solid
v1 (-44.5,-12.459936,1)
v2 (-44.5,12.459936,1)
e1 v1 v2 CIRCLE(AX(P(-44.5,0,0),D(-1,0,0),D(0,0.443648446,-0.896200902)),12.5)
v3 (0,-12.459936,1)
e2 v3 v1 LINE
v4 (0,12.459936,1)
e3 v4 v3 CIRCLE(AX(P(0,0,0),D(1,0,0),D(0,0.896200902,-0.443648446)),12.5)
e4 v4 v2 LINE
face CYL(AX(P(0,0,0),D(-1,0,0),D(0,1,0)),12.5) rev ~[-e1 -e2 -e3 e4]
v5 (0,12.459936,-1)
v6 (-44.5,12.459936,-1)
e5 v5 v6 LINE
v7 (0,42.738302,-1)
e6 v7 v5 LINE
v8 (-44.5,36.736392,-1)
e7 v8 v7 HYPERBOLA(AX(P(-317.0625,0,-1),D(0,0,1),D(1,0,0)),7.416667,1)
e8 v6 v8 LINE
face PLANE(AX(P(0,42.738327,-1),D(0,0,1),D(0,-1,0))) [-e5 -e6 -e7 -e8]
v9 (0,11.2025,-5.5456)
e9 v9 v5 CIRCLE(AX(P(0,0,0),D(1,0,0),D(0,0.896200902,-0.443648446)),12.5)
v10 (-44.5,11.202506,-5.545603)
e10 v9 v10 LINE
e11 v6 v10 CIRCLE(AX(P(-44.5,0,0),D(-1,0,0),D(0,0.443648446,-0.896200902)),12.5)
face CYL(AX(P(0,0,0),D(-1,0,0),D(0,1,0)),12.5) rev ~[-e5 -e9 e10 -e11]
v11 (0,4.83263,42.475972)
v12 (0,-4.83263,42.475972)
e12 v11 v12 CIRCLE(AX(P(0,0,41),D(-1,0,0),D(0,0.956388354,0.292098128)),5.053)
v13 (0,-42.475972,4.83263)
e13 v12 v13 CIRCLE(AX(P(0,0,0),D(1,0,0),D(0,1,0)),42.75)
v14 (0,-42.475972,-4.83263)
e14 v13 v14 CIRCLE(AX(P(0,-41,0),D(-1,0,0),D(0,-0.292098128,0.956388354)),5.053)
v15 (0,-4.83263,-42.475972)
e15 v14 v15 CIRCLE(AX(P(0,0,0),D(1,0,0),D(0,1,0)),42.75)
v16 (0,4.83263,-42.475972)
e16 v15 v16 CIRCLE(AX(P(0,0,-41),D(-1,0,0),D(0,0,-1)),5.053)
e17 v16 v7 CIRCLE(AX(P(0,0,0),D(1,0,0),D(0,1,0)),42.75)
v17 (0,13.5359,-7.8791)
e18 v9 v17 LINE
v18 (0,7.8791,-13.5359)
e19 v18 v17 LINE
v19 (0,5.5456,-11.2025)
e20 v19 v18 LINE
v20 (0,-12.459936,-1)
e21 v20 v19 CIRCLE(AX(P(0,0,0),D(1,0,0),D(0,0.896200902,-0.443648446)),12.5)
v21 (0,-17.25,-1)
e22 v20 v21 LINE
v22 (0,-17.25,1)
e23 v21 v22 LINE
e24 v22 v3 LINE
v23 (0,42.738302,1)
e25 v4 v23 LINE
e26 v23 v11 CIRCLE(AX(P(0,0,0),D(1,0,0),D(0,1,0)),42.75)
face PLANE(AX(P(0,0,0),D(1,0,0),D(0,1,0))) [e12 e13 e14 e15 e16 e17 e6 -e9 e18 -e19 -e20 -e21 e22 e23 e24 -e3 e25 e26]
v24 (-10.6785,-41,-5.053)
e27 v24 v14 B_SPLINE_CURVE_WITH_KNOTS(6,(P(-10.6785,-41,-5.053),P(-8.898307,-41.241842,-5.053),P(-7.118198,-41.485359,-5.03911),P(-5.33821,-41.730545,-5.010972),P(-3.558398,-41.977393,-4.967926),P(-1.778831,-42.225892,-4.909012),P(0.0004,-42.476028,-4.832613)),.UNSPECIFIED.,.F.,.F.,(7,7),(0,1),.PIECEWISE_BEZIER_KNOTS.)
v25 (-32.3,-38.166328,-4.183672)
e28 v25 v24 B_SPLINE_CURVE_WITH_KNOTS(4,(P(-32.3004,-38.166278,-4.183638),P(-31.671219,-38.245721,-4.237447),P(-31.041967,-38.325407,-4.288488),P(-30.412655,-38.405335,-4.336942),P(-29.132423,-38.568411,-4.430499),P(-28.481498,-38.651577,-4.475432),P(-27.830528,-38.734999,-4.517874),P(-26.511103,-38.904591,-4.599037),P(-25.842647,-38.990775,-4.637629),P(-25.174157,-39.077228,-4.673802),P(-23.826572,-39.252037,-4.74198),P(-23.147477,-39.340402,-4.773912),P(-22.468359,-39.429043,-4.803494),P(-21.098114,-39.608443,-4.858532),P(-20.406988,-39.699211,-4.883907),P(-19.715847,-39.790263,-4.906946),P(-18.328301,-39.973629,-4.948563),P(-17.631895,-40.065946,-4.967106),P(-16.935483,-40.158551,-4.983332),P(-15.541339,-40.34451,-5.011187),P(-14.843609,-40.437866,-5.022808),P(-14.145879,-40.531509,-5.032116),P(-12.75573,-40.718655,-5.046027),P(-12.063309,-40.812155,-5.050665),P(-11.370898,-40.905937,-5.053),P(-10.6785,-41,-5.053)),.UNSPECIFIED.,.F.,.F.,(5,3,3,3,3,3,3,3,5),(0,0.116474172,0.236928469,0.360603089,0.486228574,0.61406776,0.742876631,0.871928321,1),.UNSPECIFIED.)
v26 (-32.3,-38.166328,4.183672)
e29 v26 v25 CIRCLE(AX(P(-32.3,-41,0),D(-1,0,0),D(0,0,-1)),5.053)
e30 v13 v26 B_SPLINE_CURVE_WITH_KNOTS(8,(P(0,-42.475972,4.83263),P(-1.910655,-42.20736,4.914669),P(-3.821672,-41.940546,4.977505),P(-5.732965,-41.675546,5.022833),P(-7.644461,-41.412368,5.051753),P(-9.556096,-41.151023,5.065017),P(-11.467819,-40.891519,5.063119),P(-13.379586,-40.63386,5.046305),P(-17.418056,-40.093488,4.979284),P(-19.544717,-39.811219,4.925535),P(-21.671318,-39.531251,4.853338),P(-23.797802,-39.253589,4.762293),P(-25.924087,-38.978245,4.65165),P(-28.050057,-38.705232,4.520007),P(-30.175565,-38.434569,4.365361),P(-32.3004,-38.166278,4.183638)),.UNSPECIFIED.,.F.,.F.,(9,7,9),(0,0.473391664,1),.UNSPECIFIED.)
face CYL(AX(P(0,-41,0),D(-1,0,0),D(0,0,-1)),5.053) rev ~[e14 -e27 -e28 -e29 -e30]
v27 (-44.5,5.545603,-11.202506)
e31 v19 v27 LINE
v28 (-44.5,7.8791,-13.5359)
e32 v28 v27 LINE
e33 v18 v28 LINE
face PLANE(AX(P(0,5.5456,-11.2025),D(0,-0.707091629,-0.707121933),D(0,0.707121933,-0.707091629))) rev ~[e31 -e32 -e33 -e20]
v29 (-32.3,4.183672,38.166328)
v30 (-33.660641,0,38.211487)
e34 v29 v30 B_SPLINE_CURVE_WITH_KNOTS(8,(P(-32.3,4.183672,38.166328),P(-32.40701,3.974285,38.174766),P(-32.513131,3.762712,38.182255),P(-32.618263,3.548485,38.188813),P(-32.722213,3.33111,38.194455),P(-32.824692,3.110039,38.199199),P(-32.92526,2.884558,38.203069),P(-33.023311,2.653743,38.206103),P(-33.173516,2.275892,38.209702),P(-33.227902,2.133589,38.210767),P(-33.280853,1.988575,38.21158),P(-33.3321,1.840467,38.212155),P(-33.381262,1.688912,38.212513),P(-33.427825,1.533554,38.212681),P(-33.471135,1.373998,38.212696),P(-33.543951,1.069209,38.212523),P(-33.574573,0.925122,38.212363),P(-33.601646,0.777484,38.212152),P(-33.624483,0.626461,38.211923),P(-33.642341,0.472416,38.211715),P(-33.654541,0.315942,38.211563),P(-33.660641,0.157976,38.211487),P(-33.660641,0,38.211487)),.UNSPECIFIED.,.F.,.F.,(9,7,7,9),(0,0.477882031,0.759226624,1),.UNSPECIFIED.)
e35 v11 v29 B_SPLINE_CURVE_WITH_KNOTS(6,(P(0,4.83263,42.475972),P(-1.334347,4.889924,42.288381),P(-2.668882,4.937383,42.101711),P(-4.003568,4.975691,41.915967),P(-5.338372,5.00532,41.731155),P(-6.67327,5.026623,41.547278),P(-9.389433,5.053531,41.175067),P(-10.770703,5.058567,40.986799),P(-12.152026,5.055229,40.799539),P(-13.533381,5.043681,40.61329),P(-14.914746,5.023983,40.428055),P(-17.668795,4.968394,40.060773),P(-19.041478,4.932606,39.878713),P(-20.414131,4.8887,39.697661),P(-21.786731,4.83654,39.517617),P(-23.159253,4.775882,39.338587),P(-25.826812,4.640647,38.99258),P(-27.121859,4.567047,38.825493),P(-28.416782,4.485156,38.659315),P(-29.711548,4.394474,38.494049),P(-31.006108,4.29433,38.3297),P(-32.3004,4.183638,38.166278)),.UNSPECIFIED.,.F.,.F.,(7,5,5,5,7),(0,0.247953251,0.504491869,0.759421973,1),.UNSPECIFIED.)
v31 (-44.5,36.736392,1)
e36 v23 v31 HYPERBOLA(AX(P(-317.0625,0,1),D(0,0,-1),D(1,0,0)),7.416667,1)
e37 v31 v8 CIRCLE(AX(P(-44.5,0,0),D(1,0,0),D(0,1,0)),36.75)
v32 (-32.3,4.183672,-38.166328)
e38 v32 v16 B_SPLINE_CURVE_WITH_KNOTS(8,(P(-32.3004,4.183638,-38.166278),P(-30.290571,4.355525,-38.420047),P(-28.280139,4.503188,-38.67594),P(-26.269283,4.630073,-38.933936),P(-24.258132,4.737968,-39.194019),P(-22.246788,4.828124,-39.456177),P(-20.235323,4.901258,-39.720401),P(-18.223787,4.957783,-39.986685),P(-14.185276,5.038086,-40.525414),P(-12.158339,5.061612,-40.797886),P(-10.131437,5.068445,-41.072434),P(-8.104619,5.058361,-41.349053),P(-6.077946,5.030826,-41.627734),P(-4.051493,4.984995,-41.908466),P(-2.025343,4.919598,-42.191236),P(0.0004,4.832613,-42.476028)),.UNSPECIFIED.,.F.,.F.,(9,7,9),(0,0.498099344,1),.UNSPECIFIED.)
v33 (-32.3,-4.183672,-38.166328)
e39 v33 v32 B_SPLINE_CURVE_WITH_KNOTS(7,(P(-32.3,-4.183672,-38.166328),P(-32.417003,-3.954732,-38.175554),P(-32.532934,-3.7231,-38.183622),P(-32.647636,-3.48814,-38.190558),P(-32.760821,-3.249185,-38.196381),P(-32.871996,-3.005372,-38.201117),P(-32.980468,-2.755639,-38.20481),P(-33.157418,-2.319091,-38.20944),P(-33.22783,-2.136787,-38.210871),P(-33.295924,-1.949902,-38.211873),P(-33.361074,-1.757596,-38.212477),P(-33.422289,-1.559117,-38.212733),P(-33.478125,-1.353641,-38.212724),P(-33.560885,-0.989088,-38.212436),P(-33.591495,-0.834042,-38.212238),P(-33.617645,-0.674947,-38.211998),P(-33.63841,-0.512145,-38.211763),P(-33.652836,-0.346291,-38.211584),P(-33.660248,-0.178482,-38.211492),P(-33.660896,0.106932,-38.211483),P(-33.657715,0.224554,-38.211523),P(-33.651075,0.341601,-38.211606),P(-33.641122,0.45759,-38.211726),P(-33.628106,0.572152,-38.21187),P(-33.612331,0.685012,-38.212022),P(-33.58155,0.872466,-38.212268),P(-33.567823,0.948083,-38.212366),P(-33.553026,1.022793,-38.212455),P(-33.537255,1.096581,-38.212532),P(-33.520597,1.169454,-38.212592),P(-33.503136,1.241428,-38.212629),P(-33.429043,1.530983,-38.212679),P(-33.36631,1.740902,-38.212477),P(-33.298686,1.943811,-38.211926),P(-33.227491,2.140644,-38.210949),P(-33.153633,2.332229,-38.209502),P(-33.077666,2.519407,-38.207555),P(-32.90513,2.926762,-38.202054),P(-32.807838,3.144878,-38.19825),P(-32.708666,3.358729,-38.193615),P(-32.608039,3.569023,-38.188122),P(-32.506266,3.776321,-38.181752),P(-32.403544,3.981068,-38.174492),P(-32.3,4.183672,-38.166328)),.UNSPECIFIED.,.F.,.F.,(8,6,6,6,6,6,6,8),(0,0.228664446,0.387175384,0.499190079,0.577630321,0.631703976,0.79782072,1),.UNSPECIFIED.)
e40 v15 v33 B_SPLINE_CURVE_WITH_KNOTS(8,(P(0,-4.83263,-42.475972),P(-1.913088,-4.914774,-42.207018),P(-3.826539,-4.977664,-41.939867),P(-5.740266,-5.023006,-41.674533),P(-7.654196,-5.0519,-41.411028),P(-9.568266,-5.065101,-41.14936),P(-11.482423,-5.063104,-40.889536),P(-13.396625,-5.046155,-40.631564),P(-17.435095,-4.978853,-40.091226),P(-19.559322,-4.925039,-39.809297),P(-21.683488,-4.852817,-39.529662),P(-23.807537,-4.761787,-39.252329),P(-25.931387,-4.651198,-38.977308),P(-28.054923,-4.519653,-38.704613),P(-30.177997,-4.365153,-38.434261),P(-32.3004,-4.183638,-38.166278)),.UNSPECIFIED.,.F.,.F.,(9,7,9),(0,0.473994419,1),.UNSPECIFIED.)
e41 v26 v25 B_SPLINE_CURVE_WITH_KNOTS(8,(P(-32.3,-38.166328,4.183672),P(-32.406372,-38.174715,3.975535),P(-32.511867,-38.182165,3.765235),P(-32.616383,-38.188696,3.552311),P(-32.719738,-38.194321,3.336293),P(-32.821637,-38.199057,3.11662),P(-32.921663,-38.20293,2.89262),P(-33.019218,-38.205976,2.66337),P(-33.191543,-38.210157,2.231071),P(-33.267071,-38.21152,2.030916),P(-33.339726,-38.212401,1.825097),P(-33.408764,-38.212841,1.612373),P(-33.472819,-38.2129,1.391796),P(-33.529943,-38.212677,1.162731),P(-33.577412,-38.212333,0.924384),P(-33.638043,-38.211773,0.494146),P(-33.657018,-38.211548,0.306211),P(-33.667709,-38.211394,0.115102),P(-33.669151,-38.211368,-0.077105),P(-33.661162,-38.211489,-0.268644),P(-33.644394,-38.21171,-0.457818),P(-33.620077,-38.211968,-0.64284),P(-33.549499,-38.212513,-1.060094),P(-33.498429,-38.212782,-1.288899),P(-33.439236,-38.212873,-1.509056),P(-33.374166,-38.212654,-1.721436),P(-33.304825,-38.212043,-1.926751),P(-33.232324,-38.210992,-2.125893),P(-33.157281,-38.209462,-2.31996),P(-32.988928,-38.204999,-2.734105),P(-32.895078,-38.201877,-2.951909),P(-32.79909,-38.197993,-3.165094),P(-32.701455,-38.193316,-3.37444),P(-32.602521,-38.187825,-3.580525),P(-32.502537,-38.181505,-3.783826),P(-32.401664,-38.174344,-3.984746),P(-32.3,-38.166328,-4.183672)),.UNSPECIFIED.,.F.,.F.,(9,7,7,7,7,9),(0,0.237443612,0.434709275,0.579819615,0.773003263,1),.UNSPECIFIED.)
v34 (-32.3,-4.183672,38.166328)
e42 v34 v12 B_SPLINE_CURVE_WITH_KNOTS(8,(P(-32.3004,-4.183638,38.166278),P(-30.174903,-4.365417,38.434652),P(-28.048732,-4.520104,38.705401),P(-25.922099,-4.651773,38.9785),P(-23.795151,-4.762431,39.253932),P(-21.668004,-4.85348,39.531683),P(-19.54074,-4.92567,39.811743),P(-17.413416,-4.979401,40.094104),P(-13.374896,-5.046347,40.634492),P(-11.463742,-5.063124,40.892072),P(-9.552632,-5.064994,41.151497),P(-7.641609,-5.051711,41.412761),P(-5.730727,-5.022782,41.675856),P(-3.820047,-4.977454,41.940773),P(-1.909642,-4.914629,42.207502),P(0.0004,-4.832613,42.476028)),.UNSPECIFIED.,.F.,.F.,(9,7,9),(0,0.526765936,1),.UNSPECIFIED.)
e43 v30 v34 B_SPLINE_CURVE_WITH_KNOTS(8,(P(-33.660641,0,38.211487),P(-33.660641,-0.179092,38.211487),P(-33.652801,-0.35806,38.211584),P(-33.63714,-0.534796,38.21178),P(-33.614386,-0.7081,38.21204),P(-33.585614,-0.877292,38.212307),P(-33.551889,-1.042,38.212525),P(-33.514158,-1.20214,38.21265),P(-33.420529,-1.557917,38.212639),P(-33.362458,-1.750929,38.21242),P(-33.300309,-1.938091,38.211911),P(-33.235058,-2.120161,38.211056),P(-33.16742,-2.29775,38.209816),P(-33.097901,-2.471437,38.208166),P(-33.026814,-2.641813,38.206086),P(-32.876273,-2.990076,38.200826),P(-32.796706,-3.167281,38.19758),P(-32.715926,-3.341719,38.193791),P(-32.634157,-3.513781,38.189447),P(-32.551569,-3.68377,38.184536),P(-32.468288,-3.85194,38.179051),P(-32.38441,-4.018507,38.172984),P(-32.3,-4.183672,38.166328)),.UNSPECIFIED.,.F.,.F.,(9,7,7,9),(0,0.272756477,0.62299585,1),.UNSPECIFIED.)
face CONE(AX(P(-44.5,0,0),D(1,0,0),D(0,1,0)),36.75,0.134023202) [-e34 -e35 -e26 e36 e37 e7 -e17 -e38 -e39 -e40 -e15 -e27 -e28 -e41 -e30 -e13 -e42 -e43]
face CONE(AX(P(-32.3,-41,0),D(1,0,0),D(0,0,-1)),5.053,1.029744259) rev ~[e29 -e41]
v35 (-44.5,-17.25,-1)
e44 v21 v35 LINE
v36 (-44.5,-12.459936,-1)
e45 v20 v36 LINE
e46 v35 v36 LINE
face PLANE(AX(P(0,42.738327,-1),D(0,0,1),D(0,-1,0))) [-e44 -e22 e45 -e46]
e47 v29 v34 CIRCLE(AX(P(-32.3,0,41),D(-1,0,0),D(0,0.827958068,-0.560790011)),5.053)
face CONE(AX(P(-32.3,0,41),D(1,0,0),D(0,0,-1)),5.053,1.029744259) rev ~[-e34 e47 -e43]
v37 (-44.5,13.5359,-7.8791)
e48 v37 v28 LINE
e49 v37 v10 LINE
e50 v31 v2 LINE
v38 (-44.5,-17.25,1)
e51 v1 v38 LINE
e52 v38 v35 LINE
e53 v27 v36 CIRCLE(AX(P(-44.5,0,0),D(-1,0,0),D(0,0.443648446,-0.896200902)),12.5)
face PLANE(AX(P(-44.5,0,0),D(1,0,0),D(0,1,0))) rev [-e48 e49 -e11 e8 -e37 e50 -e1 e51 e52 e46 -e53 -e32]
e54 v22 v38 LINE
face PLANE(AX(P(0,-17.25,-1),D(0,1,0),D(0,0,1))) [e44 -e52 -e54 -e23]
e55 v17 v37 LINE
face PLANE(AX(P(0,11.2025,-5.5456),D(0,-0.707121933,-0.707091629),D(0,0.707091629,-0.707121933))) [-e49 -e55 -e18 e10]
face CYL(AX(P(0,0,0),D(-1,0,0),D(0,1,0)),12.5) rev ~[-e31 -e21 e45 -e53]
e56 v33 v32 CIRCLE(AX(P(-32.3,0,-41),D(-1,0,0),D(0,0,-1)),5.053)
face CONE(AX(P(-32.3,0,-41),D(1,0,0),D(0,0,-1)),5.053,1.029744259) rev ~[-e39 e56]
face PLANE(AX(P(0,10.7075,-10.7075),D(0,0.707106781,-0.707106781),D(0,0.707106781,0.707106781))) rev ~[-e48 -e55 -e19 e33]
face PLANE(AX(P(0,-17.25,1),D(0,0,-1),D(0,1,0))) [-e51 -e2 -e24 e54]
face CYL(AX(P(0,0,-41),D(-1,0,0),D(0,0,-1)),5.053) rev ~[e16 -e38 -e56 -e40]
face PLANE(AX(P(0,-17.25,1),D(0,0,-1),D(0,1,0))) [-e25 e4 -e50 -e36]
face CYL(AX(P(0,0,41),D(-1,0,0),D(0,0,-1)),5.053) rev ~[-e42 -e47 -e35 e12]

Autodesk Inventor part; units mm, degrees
ref_plane "YZ Plane" through (0, 0, 0) normal (1, 0, 0) x (0, 1, 0)
ref_plane "XZ Plane" through (0, 0, 0) normal (0, 1, 0) x (-1, 0, 0)
ref_plane "XY Plane" through (0, 0, 0) normal (0, 0, 1) x (1, 0, 0)
sketch "Esquisse1" plane through (0, 0, 0) normal (0, 0, 1) x (1, 0, 0)
  line L0 (-36.1898, 0) -> (37.2521, 0)
  line L1 (0, 12.5) -> (-44.5, 12.5)
  line L2 (-44.5, 12.5) -> (-44.5, 36.75)
  line L3 (-44.5, 36.75) -> (0, 42.75)
  line L4 (0, 42.75) -> (0, 12.5)
  point P0 (0, 0)
  dimension "d0" = 25
  dimension "d1" = 85.5
  dimension "d2" = 0
  dimension "d3" = 73.5
  dimension "d4" = 44.5
  dimension "d5" = 0
revolve "Révolution1" add sketch "Esquisse1" angle 360 about axis through (-36.1898, 0, 0) along (1, 0, 0)
sketch "Esquisse3" plane through (0, 0, 0) normal (1, 0, 0) x (0, 0, -1)
  circle A0 centre (0, 0) radius 41
  circle A1 centre (0, 0) radius 12.5 projected
  line L0 (0, 0) -> (-59.2945, 0)
  line L1 (0, 0) -> (0, -53.2291)
  line L2 (0, 0) -> (55.0659, 0)
  point P0 (0, -41)
  point P1 (41, 0)
  point P2 (-41, 0)
  dimension "d16" = 82
hole "Perçage1" at (0, -41, 0) at (0, 0, 41) at (0, 0, -41) direction (-1, 0, 0) diameter 10.106 depth 32.3 tip angle 118 thread size "M12x1.75" class "6H" standard "ANSI Metric M Profile"
sketch "Esquisse4" plane through (0, 0, 0) normal (1, 0, 0) x (0, 0, 1)
  line L0 (0, 0) -> (-39.036, -39.036)
  line L1 (0, 0) -> (-55.3193, 0)
  circle A0 centre (0, 0) radius 12.5 projected
  line L2 (-5.5456, -11.2025) -> (-7.8791, -13.5359)
  line L3 (-11.2025, -5.5456) -> (-13.5359, -7.8791)
  line L4 (-13.5359, -7.8791) -> (-7.8791, -13.5359)
  dimension "d17" = 45
  dimension "d20" = 3.3
  dimension "d21" = 3.3
  dimension "d22" = 4
  dimension "d23" = 4
extrude "Extrusion1" cut sketch "Esquisse4" against normal through all contours A0 L2 L4 L0 | L0 L4 L3 A0
sketch "Esquisse5" plane through (0, 0, 0) normal (1, 0, 0) x (0, 0, 1)
  line L0 (-1, 17.25) -> (1, 17.25)
  line L1 (1, 17.25) -> (1, -42.75)
  line L2 (1, -42.75) -> (-1, -42.75)
  line L3 (-1, -42.75) -> (-1, 17.25)
  line L4 (-1, 17.25) -> (1, -42.75) construction
  line L5 (1, 17.25) -> (-1, -42.75) construction
  arc A0 (-4.8326, 42.476) -> (4.8326, 42.476) centre (0, 0) ccw projected
  point P0 (0, -12.75)
  point P1 (42.6948, 2.1722)
  point P2 (-42.6948, 2.1722)
  point P3 (4.9266, -42.4652)
  point P4 (42.5102, -4.5219)
  dimension "d26" = 2
  dimension "d27" = 60
  dimension "d28" = 0
extrude "Extrusion2" cut sketch "Esquisse5" against normal through all
properties part number "Douille2517"
